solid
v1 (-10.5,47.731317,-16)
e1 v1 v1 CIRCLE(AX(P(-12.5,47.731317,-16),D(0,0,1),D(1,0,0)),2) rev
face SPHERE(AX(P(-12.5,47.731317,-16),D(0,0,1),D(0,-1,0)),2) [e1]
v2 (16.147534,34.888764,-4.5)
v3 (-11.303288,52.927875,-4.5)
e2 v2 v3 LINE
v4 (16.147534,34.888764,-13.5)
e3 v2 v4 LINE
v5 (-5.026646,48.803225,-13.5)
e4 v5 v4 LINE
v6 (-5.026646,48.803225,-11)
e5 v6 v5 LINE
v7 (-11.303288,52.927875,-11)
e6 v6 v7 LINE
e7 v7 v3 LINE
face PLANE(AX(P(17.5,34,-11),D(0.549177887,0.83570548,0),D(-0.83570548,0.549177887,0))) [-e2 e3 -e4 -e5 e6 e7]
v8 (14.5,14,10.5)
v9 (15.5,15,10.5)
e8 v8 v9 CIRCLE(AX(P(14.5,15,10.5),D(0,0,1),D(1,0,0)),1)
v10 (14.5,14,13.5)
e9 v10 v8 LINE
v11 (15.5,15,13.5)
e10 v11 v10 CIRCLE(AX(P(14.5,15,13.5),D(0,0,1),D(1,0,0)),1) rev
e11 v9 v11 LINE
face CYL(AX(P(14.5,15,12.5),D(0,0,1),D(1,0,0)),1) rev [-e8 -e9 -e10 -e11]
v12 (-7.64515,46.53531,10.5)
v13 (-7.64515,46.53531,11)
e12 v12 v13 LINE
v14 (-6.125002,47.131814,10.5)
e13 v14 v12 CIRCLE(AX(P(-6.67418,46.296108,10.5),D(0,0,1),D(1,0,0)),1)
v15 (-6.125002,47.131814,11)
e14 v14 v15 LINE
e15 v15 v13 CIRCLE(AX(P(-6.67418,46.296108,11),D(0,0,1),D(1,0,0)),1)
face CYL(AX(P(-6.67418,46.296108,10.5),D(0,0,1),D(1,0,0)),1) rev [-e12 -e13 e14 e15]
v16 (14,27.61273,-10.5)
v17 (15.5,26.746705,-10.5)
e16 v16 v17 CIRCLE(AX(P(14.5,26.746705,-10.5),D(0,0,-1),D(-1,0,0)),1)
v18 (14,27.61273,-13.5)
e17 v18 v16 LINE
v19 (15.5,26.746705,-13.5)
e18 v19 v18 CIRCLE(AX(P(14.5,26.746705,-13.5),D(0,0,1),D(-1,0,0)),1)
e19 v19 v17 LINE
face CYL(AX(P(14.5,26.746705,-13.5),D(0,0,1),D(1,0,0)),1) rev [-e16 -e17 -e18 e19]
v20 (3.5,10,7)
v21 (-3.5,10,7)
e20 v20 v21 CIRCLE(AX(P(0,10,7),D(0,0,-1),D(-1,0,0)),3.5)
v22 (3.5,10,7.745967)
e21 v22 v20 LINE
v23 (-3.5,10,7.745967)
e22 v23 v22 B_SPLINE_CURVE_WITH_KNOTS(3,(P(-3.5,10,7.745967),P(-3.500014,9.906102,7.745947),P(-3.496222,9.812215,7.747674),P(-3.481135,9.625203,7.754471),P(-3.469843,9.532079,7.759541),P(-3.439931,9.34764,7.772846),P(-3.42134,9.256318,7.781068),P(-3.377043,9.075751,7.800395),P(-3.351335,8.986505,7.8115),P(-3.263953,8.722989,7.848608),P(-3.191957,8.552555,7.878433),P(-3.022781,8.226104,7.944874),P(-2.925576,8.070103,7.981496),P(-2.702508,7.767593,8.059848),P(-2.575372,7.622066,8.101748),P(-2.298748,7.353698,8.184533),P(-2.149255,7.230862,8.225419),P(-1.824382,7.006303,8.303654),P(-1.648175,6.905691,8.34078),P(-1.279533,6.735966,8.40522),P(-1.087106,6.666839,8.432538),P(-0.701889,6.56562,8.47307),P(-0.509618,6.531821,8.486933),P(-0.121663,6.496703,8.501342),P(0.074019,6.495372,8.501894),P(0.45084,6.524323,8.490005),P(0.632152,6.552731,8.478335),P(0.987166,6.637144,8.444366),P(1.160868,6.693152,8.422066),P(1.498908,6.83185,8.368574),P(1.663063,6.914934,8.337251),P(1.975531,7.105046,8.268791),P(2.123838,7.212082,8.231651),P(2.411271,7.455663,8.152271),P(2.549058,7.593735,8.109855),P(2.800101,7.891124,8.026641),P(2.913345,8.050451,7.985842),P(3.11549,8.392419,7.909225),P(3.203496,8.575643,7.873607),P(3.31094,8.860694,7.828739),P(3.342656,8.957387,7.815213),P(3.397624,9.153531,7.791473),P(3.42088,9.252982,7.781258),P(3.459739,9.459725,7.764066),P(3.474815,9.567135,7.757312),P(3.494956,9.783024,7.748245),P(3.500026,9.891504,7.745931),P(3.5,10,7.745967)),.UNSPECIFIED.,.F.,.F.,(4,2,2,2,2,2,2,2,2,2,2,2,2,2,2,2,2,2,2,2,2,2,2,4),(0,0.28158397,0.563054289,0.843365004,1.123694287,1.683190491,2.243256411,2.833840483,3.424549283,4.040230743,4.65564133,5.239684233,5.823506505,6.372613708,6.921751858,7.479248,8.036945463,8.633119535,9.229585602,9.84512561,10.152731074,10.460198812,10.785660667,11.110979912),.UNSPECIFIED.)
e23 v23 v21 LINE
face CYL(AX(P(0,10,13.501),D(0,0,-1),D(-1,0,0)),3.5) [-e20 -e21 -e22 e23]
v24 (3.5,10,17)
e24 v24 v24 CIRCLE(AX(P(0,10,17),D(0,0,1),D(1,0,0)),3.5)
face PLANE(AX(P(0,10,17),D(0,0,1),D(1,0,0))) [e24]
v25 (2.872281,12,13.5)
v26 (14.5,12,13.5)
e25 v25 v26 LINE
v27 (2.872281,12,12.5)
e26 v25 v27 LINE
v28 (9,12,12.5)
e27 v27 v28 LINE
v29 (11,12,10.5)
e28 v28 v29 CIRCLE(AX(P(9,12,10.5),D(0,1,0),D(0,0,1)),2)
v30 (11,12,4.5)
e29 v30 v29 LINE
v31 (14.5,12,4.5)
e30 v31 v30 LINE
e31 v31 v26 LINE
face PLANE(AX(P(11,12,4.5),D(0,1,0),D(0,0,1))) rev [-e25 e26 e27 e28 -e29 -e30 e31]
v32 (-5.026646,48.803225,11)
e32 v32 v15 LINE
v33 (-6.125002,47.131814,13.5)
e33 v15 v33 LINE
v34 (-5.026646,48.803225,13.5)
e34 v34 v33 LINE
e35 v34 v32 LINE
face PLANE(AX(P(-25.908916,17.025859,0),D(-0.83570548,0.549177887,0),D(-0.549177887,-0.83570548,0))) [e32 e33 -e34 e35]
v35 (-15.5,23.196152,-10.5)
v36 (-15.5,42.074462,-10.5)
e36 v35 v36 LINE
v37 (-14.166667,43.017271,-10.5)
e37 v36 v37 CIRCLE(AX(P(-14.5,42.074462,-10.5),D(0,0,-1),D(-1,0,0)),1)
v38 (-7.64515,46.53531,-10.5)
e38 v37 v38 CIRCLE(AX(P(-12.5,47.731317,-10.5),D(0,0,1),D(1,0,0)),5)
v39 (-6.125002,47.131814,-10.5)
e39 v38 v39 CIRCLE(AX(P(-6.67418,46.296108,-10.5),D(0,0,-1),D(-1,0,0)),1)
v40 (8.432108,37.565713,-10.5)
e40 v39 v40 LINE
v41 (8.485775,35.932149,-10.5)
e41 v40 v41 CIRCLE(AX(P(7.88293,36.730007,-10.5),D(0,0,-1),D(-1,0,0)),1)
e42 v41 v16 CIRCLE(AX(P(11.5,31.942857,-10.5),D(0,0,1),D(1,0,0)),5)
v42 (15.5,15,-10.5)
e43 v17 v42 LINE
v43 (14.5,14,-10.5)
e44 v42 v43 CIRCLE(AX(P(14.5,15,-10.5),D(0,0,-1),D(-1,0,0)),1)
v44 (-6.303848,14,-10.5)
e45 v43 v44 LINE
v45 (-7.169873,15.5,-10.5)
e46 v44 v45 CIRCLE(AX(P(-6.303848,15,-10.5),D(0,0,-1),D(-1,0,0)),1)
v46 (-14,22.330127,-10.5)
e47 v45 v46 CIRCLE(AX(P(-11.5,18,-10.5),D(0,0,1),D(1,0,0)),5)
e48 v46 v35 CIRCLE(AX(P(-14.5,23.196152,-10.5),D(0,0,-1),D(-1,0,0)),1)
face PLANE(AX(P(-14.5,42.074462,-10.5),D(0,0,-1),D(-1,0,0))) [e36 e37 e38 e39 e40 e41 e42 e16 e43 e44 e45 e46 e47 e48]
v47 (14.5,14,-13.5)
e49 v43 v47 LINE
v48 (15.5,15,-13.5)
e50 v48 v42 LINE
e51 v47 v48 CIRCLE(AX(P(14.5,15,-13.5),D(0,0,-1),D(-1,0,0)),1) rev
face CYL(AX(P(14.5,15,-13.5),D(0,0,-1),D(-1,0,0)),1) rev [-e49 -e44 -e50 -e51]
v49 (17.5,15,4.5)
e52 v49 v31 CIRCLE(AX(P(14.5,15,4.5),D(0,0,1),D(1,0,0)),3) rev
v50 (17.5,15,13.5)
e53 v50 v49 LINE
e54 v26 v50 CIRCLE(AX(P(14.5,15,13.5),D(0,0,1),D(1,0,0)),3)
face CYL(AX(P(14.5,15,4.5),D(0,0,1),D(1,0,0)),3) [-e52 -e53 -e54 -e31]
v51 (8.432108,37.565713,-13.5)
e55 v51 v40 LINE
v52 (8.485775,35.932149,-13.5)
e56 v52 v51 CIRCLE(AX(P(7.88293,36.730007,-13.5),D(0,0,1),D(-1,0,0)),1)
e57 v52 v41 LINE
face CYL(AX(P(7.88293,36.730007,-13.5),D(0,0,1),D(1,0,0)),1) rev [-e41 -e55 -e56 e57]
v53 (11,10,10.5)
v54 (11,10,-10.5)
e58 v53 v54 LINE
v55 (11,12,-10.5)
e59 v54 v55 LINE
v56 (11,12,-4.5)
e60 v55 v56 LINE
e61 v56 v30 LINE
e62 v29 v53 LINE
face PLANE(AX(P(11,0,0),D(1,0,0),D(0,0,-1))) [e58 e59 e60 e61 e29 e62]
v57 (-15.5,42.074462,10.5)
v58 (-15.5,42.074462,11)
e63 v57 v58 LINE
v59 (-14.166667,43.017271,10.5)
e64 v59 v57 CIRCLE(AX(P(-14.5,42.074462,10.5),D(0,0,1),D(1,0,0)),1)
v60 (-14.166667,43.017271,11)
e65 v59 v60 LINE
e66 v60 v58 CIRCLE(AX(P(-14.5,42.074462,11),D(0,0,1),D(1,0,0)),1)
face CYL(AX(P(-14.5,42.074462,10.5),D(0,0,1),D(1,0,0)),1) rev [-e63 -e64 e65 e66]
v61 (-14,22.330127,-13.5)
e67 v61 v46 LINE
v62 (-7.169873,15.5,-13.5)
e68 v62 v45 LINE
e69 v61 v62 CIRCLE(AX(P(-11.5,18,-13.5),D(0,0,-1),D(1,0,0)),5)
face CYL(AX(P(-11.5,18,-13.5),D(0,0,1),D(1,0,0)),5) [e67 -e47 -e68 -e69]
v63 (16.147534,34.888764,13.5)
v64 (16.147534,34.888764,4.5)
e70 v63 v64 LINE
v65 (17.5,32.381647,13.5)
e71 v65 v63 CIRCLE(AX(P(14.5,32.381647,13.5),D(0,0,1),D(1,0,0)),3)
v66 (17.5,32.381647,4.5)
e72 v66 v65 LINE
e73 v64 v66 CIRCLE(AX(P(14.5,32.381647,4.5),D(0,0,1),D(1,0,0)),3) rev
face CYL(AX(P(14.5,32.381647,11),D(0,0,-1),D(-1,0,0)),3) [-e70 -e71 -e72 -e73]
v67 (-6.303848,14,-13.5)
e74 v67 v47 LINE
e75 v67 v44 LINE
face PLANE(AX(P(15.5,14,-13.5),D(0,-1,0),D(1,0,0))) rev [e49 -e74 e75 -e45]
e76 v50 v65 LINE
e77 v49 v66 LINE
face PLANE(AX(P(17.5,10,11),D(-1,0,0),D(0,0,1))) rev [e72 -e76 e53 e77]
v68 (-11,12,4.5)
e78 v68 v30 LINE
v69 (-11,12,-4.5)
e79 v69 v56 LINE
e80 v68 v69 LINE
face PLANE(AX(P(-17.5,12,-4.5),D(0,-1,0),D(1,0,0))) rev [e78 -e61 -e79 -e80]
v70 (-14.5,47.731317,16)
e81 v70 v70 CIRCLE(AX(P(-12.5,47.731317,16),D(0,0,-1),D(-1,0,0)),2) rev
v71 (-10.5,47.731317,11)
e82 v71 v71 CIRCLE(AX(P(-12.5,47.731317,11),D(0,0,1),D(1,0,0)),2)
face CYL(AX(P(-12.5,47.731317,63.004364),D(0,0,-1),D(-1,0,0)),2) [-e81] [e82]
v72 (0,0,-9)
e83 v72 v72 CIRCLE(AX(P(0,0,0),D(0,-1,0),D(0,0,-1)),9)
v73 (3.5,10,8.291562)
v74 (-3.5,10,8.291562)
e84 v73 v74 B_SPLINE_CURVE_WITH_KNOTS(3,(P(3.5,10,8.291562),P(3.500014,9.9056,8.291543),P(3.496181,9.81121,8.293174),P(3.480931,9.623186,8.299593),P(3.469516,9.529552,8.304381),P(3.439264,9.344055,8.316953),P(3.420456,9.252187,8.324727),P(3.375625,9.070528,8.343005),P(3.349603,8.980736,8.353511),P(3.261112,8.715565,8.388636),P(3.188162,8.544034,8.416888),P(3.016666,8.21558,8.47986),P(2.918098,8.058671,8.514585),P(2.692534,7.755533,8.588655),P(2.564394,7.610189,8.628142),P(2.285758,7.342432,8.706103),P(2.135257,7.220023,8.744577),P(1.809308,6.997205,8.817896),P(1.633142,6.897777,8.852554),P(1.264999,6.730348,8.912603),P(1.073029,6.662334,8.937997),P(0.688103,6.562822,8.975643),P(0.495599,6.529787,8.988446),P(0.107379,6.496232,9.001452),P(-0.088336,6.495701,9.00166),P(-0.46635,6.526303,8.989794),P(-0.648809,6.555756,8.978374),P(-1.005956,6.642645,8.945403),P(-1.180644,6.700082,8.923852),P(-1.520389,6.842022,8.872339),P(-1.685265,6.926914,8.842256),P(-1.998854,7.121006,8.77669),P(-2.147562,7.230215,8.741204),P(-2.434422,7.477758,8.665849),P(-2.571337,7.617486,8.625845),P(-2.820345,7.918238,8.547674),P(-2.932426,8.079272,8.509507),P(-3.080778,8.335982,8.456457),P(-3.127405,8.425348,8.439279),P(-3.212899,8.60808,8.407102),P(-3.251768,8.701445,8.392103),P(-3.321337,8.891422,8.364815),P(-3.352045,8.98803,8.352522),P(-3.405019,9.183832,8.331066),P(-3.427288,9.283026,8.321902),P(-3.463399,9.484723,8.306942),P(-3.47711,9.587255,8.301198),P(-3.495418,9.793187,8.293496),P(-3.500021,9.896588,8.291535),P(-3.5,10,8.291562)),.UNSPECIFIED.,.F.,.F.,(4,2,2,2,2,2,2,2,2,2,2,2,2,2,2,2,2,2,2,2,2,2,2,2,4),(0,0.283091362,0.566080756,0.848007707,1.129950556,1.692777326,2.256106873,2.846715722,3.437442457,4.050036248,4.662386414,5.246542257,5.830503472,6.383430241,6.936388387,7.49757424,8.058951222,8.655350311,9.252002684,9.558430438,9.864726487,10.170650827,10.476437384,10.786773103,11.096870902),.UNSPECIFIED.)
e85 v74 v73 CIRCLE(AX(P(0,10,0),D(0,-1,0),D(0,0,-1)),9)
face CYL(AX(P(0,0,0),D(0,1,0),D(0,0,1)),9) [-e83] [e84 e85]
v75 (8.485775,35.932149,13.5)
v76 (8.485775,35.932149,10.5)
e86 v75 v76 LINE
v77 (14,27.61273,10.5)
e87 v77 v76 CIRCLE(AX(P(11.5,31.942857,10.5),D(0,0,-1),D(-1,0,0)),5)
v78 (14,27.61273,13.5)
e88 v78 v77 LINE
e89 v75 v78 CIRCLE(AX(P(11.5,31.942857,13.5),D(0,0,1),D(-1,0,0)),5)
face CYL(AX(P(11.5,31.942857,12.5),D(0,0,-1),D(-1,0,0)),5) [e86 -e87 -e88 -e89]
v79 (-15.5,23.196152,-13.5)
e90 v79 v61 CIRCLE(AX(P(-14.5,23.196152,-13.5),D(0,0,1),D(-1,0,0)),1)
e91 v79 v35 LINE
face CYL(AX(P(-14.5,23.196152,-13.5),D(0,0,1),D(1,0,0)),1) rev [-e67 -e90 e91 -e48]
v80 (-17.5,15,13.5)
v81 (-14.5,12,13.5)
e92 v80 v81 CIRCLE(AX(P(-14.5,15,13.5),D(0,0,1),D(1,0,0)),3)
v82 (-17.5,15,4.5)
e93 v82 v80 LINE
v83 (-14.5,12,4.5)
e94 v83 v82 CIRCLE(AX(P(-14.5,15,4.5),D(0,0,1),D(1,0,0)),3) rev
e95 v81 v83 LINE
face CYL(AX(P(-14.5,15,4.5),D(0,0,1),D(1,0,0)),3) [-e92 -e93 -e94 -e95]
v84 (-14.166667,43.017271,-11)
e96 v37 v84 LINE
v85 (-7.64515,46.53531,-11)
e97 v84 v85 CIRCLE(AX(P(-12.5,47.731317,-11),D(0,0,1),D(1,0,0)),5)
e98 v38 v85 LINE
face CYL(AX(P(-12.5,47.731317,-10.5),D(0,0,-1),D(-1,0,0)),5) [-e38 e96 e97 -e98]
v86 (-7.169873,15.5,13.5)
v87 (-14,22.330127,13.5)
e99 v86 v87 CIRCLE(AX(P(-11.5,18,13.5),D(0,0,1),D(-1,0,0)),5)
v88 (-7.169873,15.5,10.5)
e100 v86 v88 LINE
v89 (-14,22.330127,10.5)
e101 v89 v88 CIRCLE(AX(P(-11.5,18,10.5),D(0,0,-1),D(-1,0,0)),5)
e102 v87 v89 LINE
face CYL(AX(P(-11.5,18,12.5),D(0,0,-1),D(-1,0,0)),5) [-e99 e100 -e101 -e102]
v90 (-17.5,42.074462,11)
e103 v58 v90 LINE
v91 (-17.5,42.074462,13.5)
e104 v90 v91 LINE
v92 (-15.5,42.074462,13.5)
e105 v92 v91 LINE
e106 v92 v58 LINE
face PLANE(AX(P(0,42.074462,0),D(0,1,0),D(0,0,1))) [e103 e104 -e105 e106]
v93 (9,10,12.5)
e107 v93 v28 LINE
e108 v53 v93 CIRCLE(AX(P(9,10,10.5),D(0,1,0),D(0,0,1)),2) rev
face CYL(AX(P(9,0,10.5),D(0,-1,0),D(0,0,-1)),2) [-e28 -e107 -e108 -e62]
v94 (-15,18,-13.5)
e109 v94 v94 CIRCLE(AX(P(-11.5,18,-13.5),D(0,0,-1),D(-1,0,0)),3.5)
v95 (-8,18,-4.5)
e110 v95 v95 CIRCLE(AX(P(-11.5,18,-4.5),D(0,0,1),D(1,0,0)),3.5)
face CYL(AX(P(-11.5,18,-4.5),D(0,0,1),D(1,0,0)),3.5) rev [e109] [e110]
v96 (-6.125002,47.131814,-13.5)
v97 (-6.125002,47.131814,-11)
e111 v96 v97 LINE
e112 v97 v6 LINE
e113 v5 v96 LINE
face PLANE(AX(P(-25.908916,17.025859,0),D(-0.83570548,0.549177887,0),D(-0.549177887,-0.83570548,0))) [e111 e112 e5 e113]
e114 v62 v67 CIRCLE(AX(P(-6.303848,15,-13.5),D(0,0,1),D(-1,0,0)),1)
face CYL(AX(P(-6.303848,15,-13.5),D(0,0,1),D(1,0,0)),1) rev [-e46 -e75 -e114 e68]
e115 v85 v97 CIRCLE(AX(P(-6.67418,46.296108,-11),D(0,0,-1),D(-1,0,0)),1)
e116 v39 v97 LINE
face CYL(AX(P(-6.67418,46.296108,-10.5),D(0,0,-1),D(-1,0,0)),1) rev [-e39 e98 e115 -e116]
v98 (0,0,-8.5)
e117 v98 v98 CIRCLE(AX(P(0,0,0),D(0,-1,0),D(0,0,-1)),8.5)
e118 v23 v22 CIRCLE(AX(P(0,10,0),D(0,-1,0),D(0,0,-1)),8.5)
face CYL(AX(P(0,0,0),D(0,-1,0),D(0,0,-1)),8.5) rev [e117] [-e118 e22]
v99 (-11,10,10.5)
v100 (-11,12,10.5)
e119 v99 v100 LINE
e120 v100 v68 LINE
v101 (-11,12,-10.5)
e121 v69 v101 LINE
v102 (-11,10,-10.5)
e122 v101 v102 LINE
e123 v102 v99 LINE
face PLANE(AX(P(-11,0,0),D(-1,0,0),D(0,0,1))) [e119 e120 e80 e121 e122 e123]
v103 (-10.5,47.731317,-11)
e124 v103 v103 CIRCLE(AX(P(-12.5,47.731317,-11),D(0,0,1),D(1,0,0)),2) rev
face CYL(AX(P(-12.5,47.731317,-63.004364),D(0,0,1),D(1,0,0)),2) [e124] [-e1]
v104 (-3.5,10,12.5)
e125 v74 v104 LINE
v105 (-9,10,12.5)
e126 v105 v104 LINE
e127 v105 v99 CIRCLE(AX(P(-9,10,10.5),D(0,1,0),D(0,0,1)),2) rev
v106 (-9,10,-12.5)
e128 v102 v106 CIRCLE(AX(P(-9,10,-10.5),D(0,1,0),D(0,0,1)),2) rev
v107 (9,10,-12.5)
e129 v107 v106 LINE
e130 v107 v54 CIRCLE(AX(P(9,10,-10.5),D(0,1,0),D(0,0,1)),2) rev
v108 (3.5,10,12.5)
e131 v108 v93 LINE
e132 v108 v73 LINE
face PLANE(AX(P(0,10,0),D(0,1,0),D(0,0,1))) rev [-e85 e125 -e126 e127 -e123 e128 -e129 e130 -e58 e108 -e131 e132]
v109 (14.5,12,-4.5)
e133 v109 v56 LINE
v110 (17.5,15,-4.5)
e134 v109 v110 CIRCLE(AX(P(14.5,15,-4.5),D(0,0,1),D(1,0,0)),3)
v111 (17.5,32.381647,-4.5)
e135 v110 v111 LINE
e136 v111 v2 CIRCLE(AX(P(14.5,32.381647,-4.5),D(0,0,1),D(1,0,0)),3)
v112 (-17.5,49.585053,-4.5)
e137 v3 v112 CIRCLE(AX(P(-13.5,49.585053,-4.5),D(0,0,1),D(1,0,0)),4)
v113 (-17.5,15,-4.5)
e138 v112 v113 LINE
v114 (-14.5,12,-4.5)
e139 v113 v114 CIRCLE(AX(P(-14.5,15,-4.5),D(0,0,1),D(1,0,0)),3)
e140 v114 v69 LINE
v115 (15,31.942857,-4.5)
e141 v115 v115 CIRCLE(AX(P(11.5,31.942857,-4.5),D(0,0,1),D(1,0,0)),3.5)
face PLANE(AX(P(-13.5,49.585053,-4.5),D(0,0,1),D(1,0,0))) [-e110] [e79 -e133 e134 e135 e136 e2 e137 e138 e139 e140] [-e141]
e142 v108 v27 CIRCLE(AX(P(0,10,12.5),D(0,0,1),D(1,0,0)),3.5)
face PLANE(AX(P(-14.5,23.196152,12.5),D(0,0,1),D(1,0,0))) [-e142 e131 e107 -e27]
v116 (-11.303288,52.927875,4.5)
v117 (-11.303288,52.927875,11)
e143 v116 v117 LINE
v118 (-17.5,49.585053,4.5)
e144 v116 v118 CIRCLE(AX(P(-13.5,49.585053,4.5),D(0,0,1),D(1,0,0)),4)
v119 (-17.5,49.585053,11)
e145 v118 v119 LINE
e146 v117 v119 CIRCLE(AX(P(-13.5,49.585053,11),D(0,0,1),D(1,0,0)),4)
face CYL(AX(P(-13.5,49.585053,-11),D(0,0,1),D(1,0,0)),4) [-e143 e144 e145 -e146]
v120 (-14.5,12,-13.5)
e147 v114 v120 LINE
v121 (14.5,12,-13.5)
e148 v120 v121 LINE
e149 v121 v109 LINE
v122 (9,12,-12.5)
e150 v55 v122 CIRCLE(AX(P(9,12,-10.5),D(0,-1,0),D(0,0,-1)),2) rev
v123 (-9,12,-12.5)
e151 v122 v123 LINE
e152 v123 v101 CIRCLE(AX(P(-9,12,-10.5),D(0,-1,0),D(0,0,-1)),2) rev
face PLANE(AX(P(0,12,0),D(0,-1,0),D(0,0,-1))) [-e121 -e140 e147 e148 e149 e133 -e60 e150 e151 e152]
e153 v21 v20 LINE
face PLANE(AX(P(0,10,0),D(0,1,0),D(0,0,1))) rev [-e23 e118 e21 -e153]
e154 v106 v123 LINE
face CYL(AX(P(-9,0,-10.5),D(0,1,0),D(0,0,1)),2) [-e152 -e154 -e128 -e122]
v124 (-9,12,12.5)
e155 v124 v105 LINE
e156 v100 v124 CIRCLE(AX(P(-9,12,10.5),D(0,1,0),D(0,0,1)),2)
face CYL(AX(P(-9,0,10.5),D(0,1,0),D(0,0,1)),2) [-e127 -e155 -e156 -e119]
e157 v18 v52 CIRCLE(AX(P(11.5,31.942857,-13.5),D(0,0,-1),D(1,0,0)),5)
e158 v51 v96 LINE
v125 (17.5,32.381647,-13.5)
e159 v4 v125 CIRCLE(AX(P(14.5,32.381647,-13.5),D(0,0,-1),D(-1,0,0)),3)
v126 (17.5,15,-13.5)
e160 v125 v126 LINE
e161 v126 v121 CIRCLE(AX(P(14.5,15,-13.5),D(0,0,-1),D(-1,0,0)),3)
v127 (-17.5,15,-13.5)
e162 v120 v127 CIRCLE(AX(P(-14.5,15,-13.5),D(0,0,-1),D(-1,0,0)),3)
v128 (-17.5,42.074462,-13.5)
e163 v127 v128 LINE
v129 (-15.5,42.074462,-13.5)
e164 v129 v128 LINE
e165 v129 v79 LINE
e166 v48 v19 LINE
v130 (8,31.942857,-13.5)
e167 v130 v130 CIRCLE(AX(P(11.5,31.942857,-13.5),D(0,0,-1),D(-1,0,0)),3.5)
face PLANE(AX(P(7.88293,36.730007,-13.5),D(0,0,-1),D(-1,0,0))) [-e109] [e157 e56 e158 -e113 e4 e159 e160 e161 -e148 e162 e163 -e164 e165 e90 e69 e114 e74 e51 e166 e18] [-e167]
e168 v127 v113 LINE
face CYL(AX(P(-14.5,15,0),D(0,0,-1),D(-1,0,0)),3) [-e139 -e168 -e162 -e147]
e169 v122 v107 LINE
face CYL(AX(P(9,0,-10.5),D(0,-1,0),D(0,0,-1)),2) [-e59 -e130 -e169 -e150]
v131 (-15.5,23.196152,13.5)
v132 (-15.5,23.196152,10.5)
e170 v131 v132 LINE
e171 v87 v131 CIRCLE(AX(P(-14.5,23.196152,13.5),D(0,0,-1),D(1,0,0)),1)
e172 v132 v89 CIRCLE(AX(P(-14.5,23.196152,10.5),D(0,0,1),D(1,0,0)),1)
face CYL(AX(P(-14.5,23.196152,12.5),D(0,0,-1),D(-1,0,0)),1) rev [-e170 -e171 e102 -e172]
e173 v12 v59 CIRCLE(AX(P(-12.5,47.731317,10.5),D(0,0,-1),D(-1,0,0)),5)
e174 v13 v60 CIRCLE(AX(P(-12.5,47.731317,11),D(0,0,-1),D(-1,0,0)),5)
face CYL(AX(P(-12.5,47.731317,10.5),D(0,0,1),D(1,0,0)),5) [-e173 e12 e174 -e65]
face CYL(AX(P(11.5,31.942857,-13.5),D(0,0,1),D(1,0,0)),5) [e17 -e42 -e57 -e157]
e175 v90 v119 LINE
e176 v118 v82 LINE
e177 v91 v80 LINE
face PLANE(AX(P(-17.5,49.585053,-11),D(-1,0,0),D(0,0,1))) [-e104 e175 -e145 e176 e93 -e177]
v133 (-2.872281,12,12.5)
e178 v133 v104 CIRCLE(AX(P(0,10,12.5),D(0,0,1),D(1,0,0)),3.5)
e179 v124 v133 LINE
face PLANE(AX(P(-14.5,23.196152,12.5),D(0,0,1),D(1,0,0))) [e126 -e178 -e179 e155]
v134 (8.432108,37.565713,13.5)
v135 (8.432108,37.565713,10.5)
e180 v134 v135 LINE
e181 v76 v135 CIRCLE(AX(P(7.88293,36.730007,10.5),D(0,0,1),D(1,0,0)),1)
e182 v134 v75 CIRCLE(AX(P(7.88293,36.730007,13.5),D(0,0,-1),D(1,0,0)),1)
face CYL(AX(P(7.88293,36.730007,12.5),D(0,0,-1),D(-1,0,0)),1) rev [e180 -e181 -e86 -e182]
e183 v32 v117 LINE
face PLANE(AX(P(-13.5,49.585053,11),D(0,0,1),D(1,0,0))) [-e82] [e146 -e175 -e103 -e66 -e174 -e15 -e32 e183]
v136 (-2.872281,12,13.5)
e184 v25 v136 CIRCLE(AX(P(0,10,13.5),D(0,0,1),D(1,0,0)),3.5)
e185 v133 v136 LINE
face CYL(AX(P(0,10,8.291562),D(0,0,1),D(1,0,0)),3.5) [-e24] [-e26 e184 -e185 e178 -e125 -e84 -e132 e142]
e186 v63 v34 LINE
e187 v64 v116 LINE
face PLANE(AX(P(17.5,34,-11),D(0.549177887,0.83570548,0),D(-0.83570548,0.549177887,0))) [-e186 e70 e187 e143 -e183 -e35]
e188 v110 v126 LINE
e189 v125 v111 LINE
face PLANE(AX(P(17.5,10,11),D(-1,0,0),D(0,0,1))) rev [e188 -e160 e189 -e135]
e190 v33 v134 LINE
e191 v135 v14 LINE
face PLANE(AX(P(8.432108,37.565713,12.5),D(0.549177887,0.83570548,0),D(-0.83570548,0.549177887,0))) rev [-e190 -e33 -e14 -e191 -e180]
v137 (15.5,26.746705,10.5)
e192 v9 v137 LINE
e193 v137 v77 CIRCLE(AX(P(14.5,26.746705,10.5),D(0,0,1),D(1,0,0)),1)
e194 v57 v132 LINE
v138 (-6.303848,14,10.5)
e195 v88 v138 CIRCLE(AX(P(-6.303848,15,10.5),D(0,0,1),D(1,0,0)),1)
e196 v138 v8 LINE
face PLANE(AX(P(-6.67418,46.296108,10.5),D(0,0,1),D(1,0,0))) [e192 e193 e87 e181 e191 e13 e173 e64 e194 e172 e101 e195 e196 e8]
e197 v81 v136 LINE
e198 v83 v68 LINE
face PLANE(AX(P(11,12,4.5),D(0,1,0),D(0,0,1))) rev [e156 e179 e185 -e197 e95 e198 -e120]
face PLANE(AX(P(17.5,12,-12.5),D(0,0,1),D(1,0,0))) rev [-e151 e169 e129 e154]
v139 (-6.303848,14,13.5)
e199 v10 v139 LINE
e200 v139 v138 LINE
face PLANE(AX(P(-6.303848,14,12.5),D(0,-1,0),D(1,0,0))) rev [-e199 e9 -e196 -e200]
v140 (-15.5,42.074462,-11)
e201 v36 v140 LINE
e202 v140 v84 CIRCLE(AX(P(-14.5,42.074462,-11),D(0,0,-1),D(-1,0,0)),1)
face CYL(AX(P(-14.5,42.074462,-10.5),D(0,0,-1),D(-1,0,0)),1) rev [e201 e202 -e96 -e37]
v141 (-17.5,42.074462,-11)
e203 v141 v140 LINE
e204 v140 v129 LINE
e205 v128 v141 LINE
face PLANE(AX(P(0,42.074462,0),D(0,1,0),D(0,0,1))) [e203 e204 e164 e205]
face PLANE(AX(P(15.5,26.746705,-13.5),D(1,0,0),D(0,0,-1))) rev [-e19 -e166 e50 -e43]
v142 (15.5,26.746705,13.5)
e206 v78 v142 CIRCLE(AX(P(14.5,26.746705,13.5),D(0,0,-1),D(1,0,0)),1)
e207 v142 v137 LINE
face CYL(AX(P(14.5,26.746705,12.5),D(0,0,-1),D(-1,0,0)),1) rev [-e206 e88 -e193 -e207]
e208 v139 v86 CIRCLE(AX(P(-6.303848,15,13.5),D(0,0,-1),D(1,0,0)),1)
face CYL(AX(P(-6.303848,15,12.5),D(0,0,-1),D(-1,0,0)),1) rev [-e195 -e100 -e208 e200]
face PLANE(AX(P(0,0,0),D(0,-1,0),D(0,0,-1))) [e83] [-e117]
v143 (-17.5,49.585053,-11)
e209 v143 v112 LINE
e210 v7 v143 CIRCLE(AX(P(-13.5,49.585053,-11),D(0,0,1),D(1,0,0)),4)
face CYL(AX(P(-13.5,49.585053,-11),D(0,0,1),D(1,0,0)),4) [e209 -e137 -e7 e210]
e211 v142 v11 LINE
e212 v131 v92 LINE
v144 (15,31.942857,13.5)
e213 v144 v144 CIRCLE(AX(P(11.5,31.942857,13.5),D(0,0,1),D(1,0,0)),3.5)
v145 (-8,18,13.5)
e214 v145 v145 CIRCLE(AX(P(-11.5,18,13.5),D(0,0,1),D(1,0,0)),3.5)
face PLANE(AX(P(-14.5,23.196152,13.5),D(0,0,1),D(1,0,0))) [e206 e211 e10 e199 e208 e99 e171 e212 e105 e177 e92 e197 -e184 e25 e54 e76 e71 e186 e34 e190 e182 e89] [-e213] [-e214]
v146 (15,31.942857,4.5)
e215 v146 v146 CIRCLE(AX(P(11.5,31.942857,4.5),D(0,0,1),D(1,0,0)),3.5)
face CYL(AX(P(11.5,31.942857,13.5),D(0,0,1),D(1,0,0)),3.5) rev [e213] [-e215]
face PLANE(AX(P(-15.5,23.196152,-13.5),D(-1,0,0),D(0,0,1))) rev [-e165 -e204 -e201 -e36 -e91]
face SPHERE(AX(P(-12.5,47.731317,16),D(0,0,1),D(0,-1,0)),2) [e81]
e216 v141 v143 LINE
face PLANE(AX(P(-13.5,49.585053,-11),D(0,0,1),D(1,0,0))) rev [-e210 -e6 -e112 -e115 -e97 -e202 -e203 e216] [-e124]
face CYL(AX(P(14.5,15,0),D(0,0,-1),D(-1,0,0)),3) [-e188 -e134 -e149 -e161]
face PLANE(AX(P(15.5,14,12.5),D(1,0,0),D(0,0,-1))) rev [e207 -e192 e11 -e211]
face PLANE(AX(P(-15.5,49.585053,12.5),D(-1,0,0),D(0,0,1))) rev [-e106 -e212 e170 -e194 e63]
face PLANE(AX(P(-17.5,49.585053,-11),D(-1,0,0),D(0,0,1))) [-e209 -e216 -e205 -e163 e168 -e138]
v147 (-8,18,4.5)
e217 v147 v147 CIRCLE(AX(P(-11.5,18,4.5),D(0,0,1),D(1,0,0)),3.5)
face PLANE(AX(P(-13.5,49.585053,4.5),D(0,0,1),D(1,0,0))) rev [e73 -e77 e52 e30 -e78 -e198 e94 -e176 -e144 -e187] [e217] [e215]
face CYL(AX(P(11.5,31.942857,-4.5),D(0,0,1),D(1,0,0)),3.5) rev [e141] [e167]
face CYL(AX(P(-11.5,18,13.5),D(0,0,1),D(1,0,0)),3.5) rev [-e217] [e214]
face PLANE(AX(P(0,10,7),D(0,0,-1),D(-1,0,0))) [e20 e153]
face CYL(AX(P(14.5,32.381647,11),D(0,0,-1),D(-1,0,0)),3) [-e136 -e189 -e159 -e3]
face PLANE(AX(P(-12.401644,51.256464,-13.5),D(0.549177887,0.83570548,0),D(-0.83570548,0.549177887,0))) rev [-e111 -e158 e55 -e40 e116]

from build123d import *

# Parameters (mm, degrees)
BOSS_EXTRUDE1_DEPTH            = 22
SKETCH2_W                      = 35
SKETCH2_H                      = 22
BOSS_EXTRUDE2_DEPTH            = 24
BOSS_EXTRUDE3_DEPTH            = 1.5
BOSS_EXTRUDE4_START            = 2.5
BOSS_EXTRUDE4_DEPTH            = 2.5
CUT_EXTRUDE1_DEPTH             = 9
SKETCH6_W                      = 35
SKETCH6_H                      = 1
CUT_EXTRUDE2_DEPTH             = 2
SKETCH7_W                      = 2
SKETCH7_H                      = 1.5
CUT_EXTRUDE3_DEPTH             = 7.510590912
SKETCH8_W                      = 1.5
SKETCH8_H                      = 2
CUT_EXTRUDE4_DEPTH             = 7.510590912
SKETCH9_W                      = 2
SKETCH9_H                      = 2.5
CUT_EXTRUDE5_DEPTH             = 7.510590912
SKETCH10_W                     = 2.5
SKETCH10_H                     = 2
CUT_EXTRUDE6_DEPTH             = 7.510590912
CUT_EXTRUDE7_DEPTH             = 6.5
CUT_EXTRUDE8_DEPTH             = 6.5
BOSS_EXTRUDE5_DEPTH            = 1
CUT_EXTRUDE9_DEPTH             = 0.5
CUT_EXTRUDE10_START            = -0.5
CUT_EXTRUDE10_DEPTH            = 0.5
SKETCH16_R                     = 9
BOSS_EXTRUDE6_DEPTH            = 10
F_17_0_17_DIAMETER_HOLE1_D     = 17
F_17_0_17_DIAMETER_HOLE1_DEPTH = 10
BOSS_EXTRUDE7_REACH            = 61.982
BOSS_EXTRUDE7_END_RADIUS       = 8.5
SKETCH22_W                     = 3.5
SKETCH22_H                     = 8.708438024
F_7_0_7_DIAMETER_HOLE1_D       = 7
F_7_0_7_DIAMETER_HOLE1_DEPTH   = 9
F_7_0_7_DIAMETER_HOLE2_D       = 7
F_7_0_7_DIAMETER_HOLE2_DEPTH   = 13.5
FILLET1_R                      = 1
FILLET2_R                      = 2
FILLET3_R                      = 3


# Read off the part's stored shape, not the designer's step: Boss-Extrude8, Boss-Extrude9
with BuildPart() as part:
    # Sketch1 → Boss-Extrude1 (new body)
    with BuildSketch(Plane.XY.offset(11)):
        with BuildLine():
            Line((-17.5, 34), (17.5, 34))
            Line((17.5, 34), (-11.303288453, 52.927875269))
            ThreePointArc((-11.303288453, 52.927875269), (-15.399098972, 53.105482741), (-17.5, 49.585053351))
            Line((-17.5, 49.585053351), (-17.5, 34))
        make_face()
    extrude(amount=-BOSS_EXTRUDE1_DEPTH)

    # Sketch2 → Boss-Extrude2 (add)
    with BuildSketch(Plane.XZ.offset(-34)):
        Rectangle(SKETCH2_W, SKETCH2_H)
    extrude(amount=BOSS_EXTRUDE2_DEPTH)

    # Sketch3 → Boss-Extrude3 (add)
    with BuildSketch(Plane.XY.offset(11)):
        with BuildLine():
            Line((17.5, 10), (-17.5, 10))
            Line((-17.5, 10), (-17.5, 49.585053351))
            Line((-17.5, 49.585053351), (-15.5, 49.585053351))
            Line((-15.5, 49.585053351), (-15.5, 23.196152423))
            ThreePointArc((-15.5, 23.196152423), (-15, 22.330127019), (-14, 22.330127019))
            ThreePointArc((-14, 22.330127019), (-7.964466094, 21.535533906), (-7.169872981, 15.5))
            ThreePointArc((-7.169872981, 15.5), (-7.169872981, 14.5), (-6.303847577, 14))
            Line((-6.303847577, 14), (15.5, 14))
            Line((15.5, 14), (15.5, 26.74670472))
            ThreePointArc((15.5, 26.74670472), (15, 27.612730124), (14, 27.612730124))
            ThreePointArc((14, 27.612730124), (7.332352094, 29.180482995), (8.485775207, 35.932148922))
            ThreePointArc((8.485775207, 35.932148922), (8.882391034, 36.762842318), (8.432108136, 37.565712758))
            Line((8.432108136, 37.565712758), (-12.401644227, 51.25646431))
            Line((-12.401644227, 51.25646431), (-11.303288453, 52.927875269))
            Line((-11.303288453, 52.927875269), (17.5, 34))
            Line((17.5, 34), (17.5, 10))
        make_face()
    extrude(amount=BOSS_EXTRUDE3_DEPTH)

    # Sketch4 → Boss-Extrude4 (add)
    with BuildSketch(Plane(origin=(0, 0, -11), x_dir=(-1, 0, 0), z_dir=(0, 0, -1)).offset(BOSS_EXTRUDE4_START)):
        with BuildLine():
            Line((12.401644227, 51.25646431), (-8.432108136, 37.565712758))
            ThreePointArc((-8.432108136, 37.565712758), (-8.882391034, 36.762842318), (-8.485775207, 35.932148922))
            ThreePointArc((-8.485775207, 35.932148922), (-7.332352094, 29.180482995), (-14, 27.612730124))
            ThreePointArc((-14, 27.612730124), (-15, 27.612730124), (-15.5, 26.74670472))
            Line((-15.5, 26.74670472), (-15.5, 14))
            Line((-15.5, 14), (6.303847577, 14))
            ThreePointArc((6.303847577, 14), (7.169872981, 14.5), (7.169872981, 15.5))
            ThreePointArc((7.169872981, 15.5), (7.964466094, 21.535533906), (14, 22.330127019))
            ThreePointArc((14, 22.330127019), (15, 22.330127019), (15.5, 23.196152423))
            Line((15.5, 23.196152423), (15.5, 49.585053351))
            Line((15.5, 49.585053351), (17.5, 49.585053351))
            Line((17.5, 49.585053351), (17.5, 10))
            Line((17.5, 10), (-17.5, 10))
            Line((-17.5, 10), (-17.5, 34))
            Line((-17.5, 34), (11.303288453, 52.927875269))
            Line((11.303288453, 52.927875269), (12.401644227, 51.25646431))
        make_face()
    extrude(amount=-BOSS_EXTRUDE4_DEPTH)

    # Sketch5 → Cut-Extrude1 (cut)
    with BuildSketch(Plane.XY.offset(4.5)):
        with BuildLine():
            Line((-17.5, 49.585053351), (-17.5, 12))
            Line((-17.5, 12), (17.5, 12))
            Line((17.5, 12), (17.5, 34))
            Line((17.5, 34), (-11.303288453, 52.927875269))
            ThreePointArc((-11.303288453, 52.927875269), (-15.399098972, 53.105482741), (-17.5, 49.585053351))
        make_face()
    extrude(amount=-CUT_EXTRUDE1_DEPTH, mode=Mode.SUBTRACT)

    # Sketch6 → Cut-Extrude2 (cut)
    with BuildSketch(Plane.XZ.offset(-10)):
        with Locations((0, -13)):
            Rectangle(SKETCH6_W, SKETCH6_H)
    extrude(amount=-CUT_EXTRUDE2_DEPTH, mode=Mode.SUBTRACT)

    # Sketch7 → Cut-Extrude3 (cut)
    with BuildSketch(Plane(origin=(0, 49.585053351, 0), x_dir=(-1, 0, 0), z_dir=(0, 1, 0))):
        with Locations((16.5, 11.75)):
            Rectangle(SKETCH7_W, SKETCH7_H)
    extrude(amount=-CUT_EXTRUDE3_DEPTH, mode=Mode.SUBTRACT)

    # Sketch8 → Cut-Extrude4 (cut)
    with BuildSketch(Plane(origin=(-32.185557553, 21.150509249, 0), x_dir=(0, 0, 1), z_dir=(-0.8357054797012744, 0.5491778866608367, 0))):
        with Locations((11.75, 37.024599326)):
            Rectangle(SKETCH8_W, SKETCH8_H)
    extrude(amount=-CUT_EXTRUDE4_DEPTH, mode=Mode.SUBTRACT)

    # Sketch9 → Cut-Extrude5 (cut)
    with BuildSketch(Plane(origin=(0, 49.585053351, 0), x_dir=(-1, 0, 0), z_dir=(0, 1, 0))):
        with Locations((16.5, -12.25)):
            Rectangle(SKETCH9_W, SKETCH9_H)
    extrude(amount=-CUT_EXTRUDE5_DEPTH, mode=Mode.SUBTRACT)

    # Sketch10 → Cut-Extrude6 (cut)
    with BuildSketch(Plane(origin=(-32.185557553, 21.150509249, 0), x_dir=(0, 0, 1), z_dir=(-0.8357054797012744, 0.5491778866608367, 0))):
        with Locations((-12.25, 37.024599326)):
            Rectangle(SKETCH10_W, SKETCH10_H)
    extrude(amount=-CUT_EXTRUDE6_DEPTH, mode=Mode.SUBTRACT)

    # Sketch11 → Cut-Extrude7 (cut)
    with BuildSketch(Plane(origin=(17.5, 0, 0), x_dir=(0, 0, -1), z_dir=(1, 0, 0))):
        Polygon((-12.5, 10), (12.5, 10), (12.5, 12), (4.5, 12), (-4.5, 12), (-12.5, 12), align=None)
    extrude(amount=-CUT_EXTRUDE7_DEPTH, mode=Mode.SUBTRACT)

    # Sketch12 → Cut-Extrude8 (cut)
    with BuildSketch(Plane.ZY.offset(17.5)):
        Polygon((-4.5, 12), (-12.5, 12), (-12.5, 10), (12.5, 10), (12.5, 12), (4.5, 12), align=None)
    extrude(amount=-CUT_EXTRUDE8_DEPTH, mode=Mode.SUBTRACT)

    # Sketch13 → Boss-Extrude5 (add)
    with BuildSketch(Plane.XY.offset(12.5)):
        with BuildLine():
            Line((17.5, 12), (-17.5, 12))
            Line((-17.5, 12), (-17.5, 42.074462439))
            Line((-17.5, 42.074462439), (-15.5, 42.074462439))
            Line((-15.5, 42.074462439), (-15.5, 23.196152423))
            ThreePointArc((-15.5, 23.196152423), (-15, 22.330127019), (-14, 22.330127019))
            ThreePointArc((-14, 22.330127019), (-7.964466094, 21.535533906), (-7.169872981, 15.5))
            ThreePointArc((-7.169872981, 15.5), (-7.169872981, 14.5), (-6.303847577, 14))
            Line((-6.303847577, 14), (15.5, 14))
            Line((15.5, 14), (15.5, 26.74670472))
            ThreePointArc((15.5, 26.74670472), (15, 27.612730124), (14, 27.612730124))
            ThreePointArc((14, 27.612730124), (7.332352094, 29.180482995), (8.485775207, 35.932148922))
            ThreePointArc((8.485775207, 35.932148922), (8.882391034, 36.762842318), (8.432108136, 37.565712758))
            Line((8.432108136, 37.565712758), (-6.125002246, 47.131813865))
            Line((-6.125002246, 47.131813865), (-5.026646473, 48.803224825))
            Line((-5.026646473, 48.803224825), (17.5, 34))
            Line((17.5, 34), (17.5, 12))
        make_face()
    extrude(amount=BOSS_EXTRUDE5_DEPTH)

    # Sketch14 → Cut-Extrude9 (cut)
    with BuildSketch(Plane(origin=(0, 0, -11), x_dir=(-1, 0, 0), z_dir=(0, 0, -1))):
        with BuildLine():
            Line((6.125002246, 47.131813865), (-8.432108136, 37.565712758))
            ThreePointArc((-8.432108136, 37.565712758), (-8.882391034, 36.762842318), (-8.485775207, 35.932148922))
            ThreePointArc((-8.485775207, 35.932148922), (-7.332352094, 29.180482995), (-14, 27.612730124))
            ThreePointArc((-14, 27.612730124), (-15, 27.612730124), (-15.5, 26.74670472))
            Line((-15.5, 26.74670472), (-15.5, 14))
            Line((-15.5, 14), (6.303847577, 14))
            ThreePointArc((6.303847577, 14), (7.169872981, 14.5), (7.169872981, 15.5))
            ThreePointArc((7.169872981, 15.5), (7.964466094, 21.535533906), (14, 22.330127019))
            ThreePointArc((14, 22.330127019), (15, 22.330127019), (15.5, 23.196152423))
            Line((15.5, 23.196152423), (15.5, 42.074462439))
            ThreePointArc((15.5, 42.074462439), (15.077350269, 42.89095902), (14.166666667, 43.01727148))
            ThreePointArc((14.166666667, 43.01727148), (10.126126285, 43.33077995), (7.64515011, 46.535309769))
            ThreePointArc((7.64515011, 46.535309769), (7.039462799, 47.227005036), (6.125002246, 47.131813865))
        make_face()
    extrude(amount=-CUT_EXTRUDE9_DEPTH, mode=Mode.SUBTRACT)

    # Sketch15 → Cut-Extrude10 (cut)
    with BuildSketch(Plane.XY.offset(11).offset(CUT_EXTRUDE10_START)):
        with BuildLine():
            Line((-15.5, 42.074462439), (-15.5, 23.196152423))
            ThreePointArc((-15.5, 23.196152423), (-15, 22.330127019), (-14, 22.330127019))
            ThreePointArc((-14, 22.330127019), (-7.964466094, 21.535533906), (-7.169872981, 15.5))
            ThreePointArc((-7.169872981, 15.5), (-7.169872981, 14.5), (-6.303847577, 14))
            Line((-6.303847577, 14), (15.5, 14))
            Line((15.5, 14), (15.5, 26.74670472))
            ThreePointArc((15.5, 26.74670472), (15, 27.612730124), (14, 27.612730124))
            ThreePointArc((14, 27.612730124), (7.332352094, 29.180482995), (8.485775207, 35.932148922))
            ThreePointArc((8.485775207, 35.932148922), (8.882391034, 36.762842318), (8.432108136, 37.565712758))
            Line((8.432108136, 37.565712758), (-6.125002246, 47.131813865))
            ThreePointArc((-6.125002246, 47.131813865), (-7.039462799, 47.227005036), (-7.64515011, 46.535309769))
            ThreePointArc((-7.64515011, 46.535309769), (-10.126126285, 43.33077995), (-14.166666667, 43.01727148))
            ThreePointArc((-14.166666667, 43.01727148), (-15.077350269, 42.89095902), (-15.5, 42.074462439))
        make_face()
    extrude(amount=CUT_EXTRUDE10_DEPTH, mode=Mode.SUBTRACT)

    # Sketch16 → Boss-Extrude6 (add)
    with BuildSketch(Plane.XZ.offset(-10)):
        with Locations(Location((0, 0, 0), (0, 0, 270))):
            Circle(SKETCH16_R)
    extrude(amount=BOSS_EXTRUDE6_DEPTH)

    # Ø17.0 (17) Diameter Hole1
    with Locations(Plane(origin=(0, 0, 0), x_dir=(-1, 0, 0), z_dir=(0, -1, 0))):
        with Locations((0, 0)):
            Hole(F_17_0_17_DIAMETER_HOLE1_D / 2, depth=F_17_0_17_DIAMETER_HOLE1_DEPTH)

    # Boss-Extrude7: up to this cylinder (the profile starts inside it)
    boss_extrude7_end = Plane(origin=(0, 8.514554, 0), z_dir=(0, -1, 0)) * Cylinder(BOSS_EXTRUDE7_END_RADIUS, 141.964, mode=Mode.PRIVATE)
    # Sketch19 → Boss-Extrude7 (add, up to the surface)
    with BuildSketch(Plane(origin=(0, 0, 7), x_dir=(-1, 0, 0), z_dir=(0, 0, -1)), mode=Mode.PRIVATE) as boss_extrude7_sk1:
        with BuildLine():
            Line((3.5, 10), (-3.5, 10))
            ThreePointArc((-3.5, 10), (0, 6.5), (3.5, 10))
        make_face()
    boss_extrude7_tool1 = extrude(boss_extrude7_sk1.sketch, amount=-BOSS_EXTRUDE7_REACH, mode=Mode.PRIVATE) & boss_extrude7_end
    add(boss_extrude7_tool1.solids().sort_by_distance((0, 8.514554, 7))[0])

    # Boss-Extrude8 outline → Boss-Extrude8 (revolve)
    with BuildSketch(Plane(origin=(-12.5, 47.731316688, 0), x_dir=(1, 0, 0), z_dir=(0, -1, 0))):
        with BuildLine():
            ThreePointArc((0, -18), (1.414213563, -17.414213562), (2, -15.999999998))
            Line((2, -15.999999998), (2, -11))
            Line((2, -11), (0, -11))
            Line((0, -11), (0, -18))
        make_face()
    revolve(axis=Axis((-12.5, 47.731316688, 0), (0, 0, 1)))

    # Boss-Extrude9 outline → Boss-Extrude9 (revolve)
    with BuildSketch(Plane(origin=(-12.5, 47.731316688, 0), x_dir=(1, 0, 0), z_dir=(0, -1, 0))):
        with BuildLine():
            Line((2, 11), (2, 15.999999998))
            ThreePointArc((2, 15.999999998), (1.414213563, 17.414213562), (0, 18))
            Line((0, 18), (0, 11))
            Line((0, 11), (2, 11))
        make_face()
    revolve(axis=Axis((-12.5, 47.731316688, 0), (0, 0, 1)))

    # Sketch22 → Revolve1 (revolve)
    with BuildSketch(Plane(origin=(0, 10, 0), x_dir=(1, 0, 0), z_dir=(0, 1, 0))):
        with Locations((1.75, -12.645780988)):
            Rectangle(SKETCH22_W, SKETCH22_H)
    revolve(axis=Axis((0, 10, 8.291561976), (0, 0, 1)))

    # Ø7.0 (7) Diameter Hole1
    with Locations(Plane.XY.offset(13.5)):
        with Locations((-11.5, 18), (11.5, 31.942857143)):
            Hole(F_7_0_7_DIAMETER_HOLE1_D / 2, depth=F_7_0_7_DIAMETER_HOLE1_DEPTH)

    # Ø7.0 (7) Diameter Hole2
    with Locations(Plane.XY.offset(-4.5)):
        with Locations((-11.5, 18), (11.5, 31.942857143)):
            Hole(F_7_0_7_DIAMETER_HOLE2_D / 2, depth=F_7_0_7_DIAMETER_HOLE2_DEPTH)

    # Fillet1
    fillet1_edges = [part.edges().sort_by_distance(p)[0] for p in [
        (15.5, 14, 12),
        (15.5, 14, -12),
    ]]
    fillet(fillet1_edges, radius=FILLET1_R)

    # Fillet2
    fillet2_edges = [part.edges().sort_by_distance(p)[0] for p in [
        (11, 11, 12.5),
        (11, 11, -12.5),
        (-11, 11, 12.5),
        (-11, 11, -12.5),
    ]]
    fillet(fillet2_edges, radius=FILLET2_R)

    # Fillet3
    fillet3_edges = [part.edges().sort_by_distance(p)[0] for p in [
        (17.5, 34, 9),
        (-17.5, 12, -9),
        (17.5, 12, -9),
        (17.5, 12, 9),
        (-17.5, 12, 9),
        (17.5, 34, -9),
    ]]
    fillet(fillet3_edges, radius=FILLET3_R)


solid = part.part
